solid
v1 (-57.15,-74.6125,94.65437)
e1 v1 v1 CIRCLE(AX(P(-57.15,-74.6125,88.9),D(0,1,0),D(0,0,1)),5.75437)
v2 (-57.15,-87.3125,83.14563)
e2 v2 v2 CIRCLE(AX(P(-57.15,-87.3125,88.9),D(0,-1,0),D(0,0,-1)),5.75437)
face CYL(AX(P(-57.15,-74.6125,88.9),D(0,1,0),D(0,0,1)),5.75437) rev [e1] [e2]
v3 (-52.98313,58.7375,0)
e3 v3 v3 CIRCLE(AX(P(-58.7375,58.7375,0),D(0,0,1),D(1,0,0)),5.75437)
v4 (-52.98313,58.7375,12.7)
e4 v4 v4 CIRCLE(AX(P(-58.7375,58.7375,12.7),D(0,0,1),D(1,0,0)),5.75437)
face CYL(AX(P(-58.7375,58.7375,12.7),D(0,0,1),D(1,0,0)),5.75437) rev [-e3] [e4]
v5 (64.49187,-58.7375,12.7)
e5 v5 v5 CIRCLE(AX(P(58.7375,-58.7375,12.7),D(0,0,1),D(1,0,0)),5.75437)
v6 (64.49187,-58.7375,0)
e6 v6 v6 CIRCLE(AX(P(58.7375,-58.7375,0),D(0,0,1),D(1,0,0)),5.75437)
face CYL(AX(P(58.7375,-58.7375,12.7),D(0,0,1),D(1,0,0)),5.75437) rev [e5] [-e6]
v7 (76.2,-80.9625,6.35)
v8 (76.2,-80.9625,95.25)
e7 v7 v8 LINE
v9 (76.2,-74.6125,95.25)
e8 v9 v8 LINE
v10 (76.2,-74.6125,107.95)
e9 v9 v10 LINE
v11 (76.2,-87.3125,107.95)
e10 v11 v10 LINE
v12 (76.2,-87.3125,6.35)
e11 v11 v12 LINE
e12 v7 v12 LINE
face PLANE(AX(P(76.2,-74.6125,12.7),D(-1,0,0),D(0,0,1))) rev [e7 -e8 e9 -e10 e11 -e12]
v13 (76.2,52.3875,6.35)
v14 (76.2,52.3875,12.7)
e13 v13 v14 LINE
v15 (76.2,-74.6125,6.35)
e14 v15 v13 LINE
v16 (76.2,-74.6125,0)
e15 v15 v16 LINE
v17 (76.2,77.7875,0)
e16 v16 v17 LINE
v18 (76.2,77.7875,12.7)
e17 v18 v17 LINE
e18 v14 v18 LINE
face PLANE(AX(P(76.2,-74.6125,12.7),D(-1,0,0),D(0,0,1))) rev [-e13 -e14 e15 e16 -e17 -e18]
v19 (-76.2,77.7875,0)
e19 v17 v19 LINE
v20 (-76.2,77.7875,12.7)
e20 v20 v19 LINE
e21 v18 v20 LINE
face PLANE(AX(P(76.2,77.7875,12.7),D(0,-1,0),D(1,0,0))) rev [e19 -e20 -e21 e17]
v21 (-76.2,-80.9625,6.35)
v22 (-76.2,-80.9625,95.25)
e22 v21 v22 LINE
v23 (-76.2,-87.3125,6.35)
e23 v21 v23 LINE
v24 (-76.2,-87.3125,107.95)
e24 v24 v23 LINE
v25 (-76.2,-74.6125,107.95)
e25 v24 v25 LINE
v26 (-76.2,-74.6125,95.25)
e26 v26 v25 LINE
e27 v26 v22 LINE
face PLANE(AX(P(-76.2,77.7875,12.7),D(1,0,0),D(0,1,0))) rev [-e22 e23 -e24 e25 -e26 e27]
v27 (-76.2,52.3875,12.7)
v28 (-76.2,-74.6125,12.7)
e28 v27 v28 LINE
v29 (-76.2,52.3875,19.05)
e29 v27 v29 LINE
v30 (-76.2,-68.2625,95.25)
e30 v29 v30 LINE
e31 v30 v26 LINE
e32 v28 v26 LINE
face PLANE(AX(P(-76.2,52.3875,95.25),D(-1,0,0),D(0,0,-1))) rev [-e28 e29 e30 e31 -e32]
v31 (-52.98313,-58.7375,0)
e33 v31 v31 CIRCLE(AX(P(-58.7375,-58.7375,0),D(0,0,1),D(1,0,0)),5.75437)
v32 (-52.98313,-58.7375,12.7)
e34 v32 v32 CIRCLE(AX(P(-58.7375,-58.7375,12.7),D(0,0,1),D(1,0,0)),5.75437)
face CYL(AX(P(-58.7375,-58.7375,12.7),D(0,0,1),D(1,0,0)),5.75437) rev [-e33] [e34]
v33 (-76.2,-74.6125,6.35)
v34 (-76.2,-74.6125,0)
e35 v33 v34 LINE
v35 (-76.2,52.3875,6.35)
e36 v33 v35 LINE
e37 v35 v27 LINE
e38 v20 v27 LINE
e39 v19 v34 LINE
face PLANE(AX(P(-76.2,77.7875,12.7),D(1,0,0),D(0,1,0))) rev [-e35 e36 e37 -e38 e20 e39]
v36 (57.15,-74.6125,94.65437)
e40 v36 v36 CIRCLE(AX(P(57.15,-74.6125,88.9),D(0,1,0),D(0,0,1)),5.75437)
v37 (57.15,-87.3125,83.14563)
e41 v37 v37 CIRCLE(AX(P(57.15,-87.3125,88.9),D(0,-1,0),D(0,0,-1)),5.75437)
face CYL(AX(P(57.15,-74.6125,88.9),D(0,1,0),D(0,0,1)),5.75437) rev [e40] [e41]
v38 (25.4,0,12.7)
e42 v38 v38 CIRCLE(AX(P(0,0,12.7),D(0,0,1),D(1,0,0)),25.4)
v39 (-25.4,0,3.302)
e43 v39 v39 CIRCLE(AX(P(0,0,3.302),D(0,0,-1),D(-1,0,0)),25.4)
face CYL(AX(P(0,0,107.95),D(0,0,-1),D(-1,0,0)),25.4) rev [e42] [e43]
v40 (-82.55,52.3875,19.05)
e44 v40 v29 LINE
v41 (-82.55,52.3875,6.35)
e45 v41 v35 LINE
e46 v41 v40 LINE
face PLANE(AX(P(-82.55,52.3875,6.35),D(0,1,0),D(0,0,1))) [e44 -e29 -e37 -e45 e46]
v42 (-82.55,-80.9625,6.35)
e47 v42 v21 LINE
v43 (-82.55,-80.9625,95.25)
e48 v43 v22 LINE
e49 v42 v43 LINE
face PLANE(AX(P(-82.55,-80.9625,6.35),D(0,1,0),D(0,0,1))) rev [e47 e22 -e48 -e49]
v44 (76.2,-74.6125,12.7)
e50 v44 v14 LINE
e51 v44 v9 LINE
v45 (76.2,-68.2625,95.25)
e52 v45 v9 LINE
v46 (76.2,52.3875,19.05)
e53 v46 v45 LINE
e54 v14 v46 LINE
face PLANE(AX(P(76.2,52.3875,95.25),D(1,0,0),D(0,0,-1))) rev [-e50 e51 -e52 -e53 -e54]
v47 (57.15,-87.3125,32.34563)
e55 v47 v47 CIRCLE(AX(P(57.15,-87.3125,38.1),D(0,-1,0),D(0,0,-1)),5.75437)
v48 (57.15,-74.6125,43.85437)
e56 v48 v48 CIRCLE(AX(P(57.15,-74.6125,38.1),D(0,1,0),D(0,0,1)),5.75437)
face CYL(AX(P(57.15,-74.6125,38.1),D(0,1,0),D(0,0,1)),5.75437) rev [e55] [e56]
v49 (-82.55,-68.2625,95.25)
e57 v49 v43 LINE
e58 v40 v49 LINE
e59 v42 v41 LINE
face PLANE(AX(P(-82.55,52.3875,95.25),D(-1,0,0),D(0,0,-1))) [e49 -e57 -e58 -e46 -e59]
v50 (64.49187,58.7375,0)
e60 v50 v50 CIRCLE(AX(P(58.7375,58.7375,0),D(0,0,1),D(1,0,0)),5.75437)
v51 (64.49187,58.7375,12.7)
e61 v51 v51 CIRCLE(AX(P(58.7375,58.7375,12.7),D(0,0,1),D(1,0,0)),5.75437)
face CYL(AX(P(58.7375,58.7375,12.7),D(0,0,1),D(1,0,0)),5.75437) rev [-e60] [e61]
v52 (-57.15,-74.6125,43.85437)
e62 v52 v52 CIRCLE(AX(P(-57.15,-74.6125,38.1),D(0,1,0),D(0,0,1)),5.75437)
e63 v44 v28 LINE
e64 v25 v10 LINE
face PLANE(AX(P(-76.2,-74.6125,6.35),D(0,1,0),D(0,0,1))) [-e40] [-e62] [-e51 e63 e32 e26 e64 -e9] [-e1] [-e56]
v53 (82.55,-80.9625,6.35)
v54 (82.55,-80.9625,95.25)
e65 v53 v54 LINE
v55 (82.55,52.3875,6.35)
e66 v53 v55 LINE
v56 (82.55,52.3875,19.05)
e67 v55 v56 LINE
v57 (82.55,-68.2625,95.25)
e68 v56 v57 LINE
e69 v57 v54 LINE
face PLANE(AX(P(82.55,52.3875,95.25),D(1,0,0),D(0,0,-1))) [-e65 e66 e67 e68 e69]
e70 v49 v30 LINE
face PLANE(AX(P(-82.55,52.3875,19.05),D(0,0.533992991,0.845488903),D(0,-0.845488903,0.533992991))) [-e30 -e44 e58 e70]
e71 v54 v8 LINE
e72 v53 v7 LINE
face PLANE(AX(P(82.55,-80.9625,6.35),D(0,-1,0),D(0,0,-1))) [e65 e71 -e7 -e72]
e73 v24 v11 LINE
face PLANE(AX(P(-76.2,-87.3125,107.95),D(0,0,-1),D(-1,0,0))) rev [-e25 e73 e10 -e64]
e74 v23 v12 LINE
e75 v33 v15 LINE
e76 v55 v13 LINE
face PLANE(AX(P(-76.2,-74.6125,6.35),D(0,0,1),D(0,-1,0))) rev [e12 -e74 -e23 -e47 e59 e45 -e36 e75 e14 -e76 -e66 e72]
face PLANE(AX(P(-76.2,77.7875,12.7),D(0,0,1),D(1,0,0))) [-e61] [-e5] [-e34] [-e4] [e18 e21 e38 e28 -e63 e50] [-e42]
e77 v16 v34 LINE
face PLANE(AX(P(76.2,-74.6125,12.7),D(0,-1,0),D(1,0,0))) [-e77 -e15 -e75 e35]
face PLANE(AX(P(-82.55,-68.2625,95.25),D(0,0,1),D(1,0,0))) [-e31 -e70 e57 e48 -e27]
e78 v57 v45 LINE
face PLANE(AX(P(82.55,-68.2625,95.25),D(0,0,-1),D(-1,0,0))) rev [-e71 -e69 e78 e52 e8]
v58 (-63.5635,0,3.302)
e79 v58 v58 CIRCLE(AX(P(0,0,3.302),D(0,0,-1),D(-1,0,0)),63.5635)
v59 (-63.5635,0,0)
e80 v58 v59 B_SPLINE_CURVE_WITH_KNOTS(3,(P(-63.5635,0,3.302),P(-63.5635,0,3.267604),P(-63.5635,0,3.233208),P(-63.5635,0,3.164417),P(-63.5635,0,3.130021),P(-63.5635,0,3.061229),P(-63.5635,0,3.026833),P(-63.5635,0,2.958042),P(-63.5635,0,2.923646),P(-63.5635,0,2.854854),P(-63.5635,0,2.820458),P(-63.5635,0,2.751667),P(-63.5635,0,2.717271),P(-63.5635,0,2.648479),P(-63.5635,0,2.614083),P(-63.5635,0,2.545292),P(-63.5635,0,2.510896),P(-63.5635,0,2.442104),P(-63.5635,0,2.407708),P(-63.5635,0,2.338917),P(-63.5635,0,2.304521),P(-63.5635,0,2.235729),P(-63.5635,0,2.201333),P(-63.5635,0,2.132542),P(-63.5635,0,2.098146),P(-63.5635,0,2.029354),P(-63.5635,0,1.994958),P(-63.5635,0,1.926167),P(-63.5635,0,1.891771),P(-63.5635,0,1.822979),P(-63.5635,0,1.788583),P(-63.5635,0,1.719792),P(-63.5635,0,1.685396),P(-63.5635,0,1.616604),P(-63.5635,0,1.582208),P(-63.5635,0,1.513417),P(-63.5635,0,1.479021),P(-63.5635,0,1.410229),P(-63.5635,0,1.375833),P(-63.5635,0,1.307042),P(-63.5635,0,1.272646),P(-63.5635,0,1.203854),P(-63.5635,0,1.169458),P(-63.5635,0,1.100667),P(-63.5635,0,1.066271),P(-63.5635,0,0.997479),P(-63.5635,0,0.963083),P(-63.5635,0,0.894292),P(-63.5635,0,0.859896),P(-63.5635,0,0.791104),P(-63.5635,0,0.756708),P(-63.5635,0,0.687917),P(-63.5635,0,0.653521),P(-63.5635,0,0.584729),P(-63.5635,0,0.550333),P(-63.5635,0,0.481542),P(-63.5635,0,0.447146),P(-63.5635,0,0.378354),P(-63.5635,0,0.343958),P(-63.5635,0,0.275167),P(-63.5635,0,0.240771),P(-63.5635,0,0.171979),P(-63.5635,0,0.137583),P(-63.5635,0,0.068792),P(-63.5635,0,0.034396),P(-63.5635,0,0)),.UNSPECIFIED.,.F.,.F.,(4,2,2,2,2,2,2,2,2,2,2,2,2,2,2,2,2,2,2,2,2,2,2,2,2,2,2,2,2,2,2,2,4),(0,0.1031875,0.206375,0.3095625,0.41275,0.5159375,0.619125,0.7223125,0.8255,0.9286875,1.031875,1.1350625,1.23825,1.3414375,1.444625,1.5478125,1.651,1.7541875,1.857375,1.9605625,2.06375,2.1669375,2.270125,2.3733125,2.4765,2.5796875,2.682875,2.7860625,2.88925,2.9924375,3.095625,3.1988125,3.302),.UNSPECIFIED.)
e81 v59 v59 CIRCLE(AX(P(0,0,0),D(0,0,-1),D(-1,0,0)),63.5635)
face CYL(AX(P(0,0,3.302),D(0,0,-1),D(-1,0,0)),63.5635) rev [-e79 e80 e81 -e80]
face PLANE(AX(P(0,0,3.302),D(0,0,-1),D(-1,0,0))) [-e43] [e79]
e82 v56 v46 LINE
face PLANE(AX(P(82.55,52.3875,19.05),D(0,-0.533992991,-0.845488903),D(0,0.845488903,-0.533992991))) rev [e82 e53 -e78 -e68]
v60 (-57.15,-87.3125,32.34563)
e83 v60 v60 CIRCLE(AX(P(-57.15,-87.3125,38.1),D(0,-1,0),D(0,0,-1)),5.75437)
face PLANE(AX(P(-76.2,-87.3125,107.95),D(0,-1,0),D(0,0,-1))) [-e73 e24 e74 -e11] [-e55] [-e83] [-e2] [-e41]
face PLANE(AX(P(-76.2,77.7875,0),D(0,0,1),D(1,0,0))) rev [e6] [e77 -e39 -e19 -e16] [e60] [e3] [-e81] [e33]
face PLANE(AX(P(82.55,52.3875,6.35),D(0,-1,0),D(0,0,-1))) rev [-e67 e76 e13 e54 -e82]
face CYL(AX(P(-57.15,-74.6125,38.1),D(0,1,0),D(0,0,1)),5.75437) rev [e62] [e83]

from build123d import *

# Parameters (mm, degrees)
SKETCH1_W                 = 152.4
SKETCH1_H                 = 152.4
BASE_EXTRUDE_DEPTH        = 12.7
SKETCH2_W                 = 101.6
SKETCH2_H                 = 12.7
BOSS_EXTRUDE1_DEPTH       = 152.4
BOSS_EXTRUDE2_DEPTH       = 6.35
SKETCH5_R                 = 63.5635
PILOT_BORE_DEPTH          = 3.302
SKETCH6_R                 = 25.4
CUT_EXTRUDE3_DEPTH        = 160.339822581
SKETCH_PATTERN1_OUTLINE_R = 5.75437
SKETCH_PATTERN1_DEPTH     = 12.7
LPATTERN1_COUNT           = 2
LPATTERN1_PITCH           = 114.3
LPATTERN1_COUNT_DIR2      = 2
LPATTERN1_PITCH_DIR2      = 50.8


# Read off the part's stored shape, not the designer's step: Sketch-Pattern1
with BuildPart() as part:
    # Sketch1 → Base-Extrude (new body)
    with BuildSketch(Plane.XY):
        with Locations((0, 1.5875)):
            Rectangle(SKETCH1_W, SKETCH1_H)
    extrude(amount=BASE_EXTRUDE_DEPTH)

    # Sketch2 → Boss-Extrude1 (add)
    with BuildSketch(Plane(origin=(76.2, 0, 0), x_dir=(0, 0, -1), z_dir=(1, 0, 0))):
        with Locations((-57.15, -80.9625)):
            Rectangle(SKETCH2_W, SKETCH2_H)
    extrude(amount=-BOSS_EXTRUDE1_DEPTH)

    # Sketch3 → Boss-Extrude2 (add)
    with BuildSketch(Plane(origin=(76.2, 0, 0), x_dir=(0, 0, -1), z_dir=(1, 0, 0))):
        Polygon((-6.35, -80.9625), (-6.35, 52.3875), (-19.05, 52.3875), (-95.25, -68.2625), (-95.25, -80.9625), align=None)
    boss_extrude2 = extrude(amount=BOSS_EXTRUDE2_DEPTH)

    # Mirror1: Boss-Extrude2 across plane
    add(boss_extrude2.mirror(Plane(origin=(0, 0, 0), x_dir=(0, 0, 1), z_dir=(1, 0, 0))))

    # Sketch5 → pilot bore (cut)
    with BuildSketch(Plane(origin=(0, 0, 0), x_dir=(-1, 0, 0), z_dir=(0, 0, -1))):
        Circle(SKETCH5_R)
    extrude(amount=-PILOT_BORE_DEPTH, mode=Mode.SUBTRACT)

    # Sketch6 → Cut-Extrude3 (cut, through all)
    with BuildSketch(Plane(origin=(0, 0, 3.302), x_dir=(-1, 0, 0), z_dir=(0, 0, -1))):
        Circle(SKETCH6_R)
    extrude(amount=-CUT_EXTRUDE3_DEPTH, mode=Mode.SUBTRACT)

    # Sketch7 → 1/2-20 Tapped Hole1 (revolve, cut)
    with BuildSketch(Plane(origin=(-58.7375, -58.7375, 12.7), x_dir=(0, -1, 0), z_dir=(1, 0, 0))):
        Polygon((0, 0), (0, 35.20757432), (5.75437, 31.75), (5.75437, 0), align=None)
    revolve(axis=Axis((-58.7375, -58.7375, 19.05), (0, 0, -1)), mode=Mode.SUBTRACT)

    # Sketch-Pattern1 outline → Sketch-Pattern1 (cut)
    with BuildSketch(Plane.XY):
        with Locations((-58.7375, 58.7375)):
            Circle(SKETCH_PATTERN1_OUTLINE_R)
        with Locations((58.7375, 58.7375)):
            Circle(SKETCH_PATTERN1_OUTLINE_R)
        with Locations((58.7375, -58.7375)):
            Circle(SKETCH_PATTERN1_OUTLINE_R)
    extrude(amount=SKETCH_PATTERN1_DEPTH, mode=Mode.SUBTRACT)

    # Sketch9 → 1/2-20 Tapped Hole2 (revolve, cut)
    with BuildSketch(Plane(origin=(-57.15, -74.6125, 88.9), x_dir=(0, 0, 1), z_dir=(1, 0, 0))):
        Polygon((0, 0), (0, 35.20757432), (5.75437, 31.75), (5.75437, 0), align=None)
    f_1_2_20_tapped_hole2 = revolve(axis=Axis((-57.15, -68.2625, 88.9), (0, -1, 0)), mode=Mode.SUBTRACT)

    # LPattern1: 1_2-20 Tapped Hole2 2 × 2
    with Locations(*[(i * LPATTERN1_PITCH, 0, -j * LPATTERN1_PITCH_DIR2) for i in range(LPATTERN1_COUNT) for j in range(LPATTERN1_COUNT_DIR2) if (i, j) != (0, 0)]):
        add(f_1_2_20_tapped_hole2, mode=Mode.SUBTRACT)


solid = part.part
